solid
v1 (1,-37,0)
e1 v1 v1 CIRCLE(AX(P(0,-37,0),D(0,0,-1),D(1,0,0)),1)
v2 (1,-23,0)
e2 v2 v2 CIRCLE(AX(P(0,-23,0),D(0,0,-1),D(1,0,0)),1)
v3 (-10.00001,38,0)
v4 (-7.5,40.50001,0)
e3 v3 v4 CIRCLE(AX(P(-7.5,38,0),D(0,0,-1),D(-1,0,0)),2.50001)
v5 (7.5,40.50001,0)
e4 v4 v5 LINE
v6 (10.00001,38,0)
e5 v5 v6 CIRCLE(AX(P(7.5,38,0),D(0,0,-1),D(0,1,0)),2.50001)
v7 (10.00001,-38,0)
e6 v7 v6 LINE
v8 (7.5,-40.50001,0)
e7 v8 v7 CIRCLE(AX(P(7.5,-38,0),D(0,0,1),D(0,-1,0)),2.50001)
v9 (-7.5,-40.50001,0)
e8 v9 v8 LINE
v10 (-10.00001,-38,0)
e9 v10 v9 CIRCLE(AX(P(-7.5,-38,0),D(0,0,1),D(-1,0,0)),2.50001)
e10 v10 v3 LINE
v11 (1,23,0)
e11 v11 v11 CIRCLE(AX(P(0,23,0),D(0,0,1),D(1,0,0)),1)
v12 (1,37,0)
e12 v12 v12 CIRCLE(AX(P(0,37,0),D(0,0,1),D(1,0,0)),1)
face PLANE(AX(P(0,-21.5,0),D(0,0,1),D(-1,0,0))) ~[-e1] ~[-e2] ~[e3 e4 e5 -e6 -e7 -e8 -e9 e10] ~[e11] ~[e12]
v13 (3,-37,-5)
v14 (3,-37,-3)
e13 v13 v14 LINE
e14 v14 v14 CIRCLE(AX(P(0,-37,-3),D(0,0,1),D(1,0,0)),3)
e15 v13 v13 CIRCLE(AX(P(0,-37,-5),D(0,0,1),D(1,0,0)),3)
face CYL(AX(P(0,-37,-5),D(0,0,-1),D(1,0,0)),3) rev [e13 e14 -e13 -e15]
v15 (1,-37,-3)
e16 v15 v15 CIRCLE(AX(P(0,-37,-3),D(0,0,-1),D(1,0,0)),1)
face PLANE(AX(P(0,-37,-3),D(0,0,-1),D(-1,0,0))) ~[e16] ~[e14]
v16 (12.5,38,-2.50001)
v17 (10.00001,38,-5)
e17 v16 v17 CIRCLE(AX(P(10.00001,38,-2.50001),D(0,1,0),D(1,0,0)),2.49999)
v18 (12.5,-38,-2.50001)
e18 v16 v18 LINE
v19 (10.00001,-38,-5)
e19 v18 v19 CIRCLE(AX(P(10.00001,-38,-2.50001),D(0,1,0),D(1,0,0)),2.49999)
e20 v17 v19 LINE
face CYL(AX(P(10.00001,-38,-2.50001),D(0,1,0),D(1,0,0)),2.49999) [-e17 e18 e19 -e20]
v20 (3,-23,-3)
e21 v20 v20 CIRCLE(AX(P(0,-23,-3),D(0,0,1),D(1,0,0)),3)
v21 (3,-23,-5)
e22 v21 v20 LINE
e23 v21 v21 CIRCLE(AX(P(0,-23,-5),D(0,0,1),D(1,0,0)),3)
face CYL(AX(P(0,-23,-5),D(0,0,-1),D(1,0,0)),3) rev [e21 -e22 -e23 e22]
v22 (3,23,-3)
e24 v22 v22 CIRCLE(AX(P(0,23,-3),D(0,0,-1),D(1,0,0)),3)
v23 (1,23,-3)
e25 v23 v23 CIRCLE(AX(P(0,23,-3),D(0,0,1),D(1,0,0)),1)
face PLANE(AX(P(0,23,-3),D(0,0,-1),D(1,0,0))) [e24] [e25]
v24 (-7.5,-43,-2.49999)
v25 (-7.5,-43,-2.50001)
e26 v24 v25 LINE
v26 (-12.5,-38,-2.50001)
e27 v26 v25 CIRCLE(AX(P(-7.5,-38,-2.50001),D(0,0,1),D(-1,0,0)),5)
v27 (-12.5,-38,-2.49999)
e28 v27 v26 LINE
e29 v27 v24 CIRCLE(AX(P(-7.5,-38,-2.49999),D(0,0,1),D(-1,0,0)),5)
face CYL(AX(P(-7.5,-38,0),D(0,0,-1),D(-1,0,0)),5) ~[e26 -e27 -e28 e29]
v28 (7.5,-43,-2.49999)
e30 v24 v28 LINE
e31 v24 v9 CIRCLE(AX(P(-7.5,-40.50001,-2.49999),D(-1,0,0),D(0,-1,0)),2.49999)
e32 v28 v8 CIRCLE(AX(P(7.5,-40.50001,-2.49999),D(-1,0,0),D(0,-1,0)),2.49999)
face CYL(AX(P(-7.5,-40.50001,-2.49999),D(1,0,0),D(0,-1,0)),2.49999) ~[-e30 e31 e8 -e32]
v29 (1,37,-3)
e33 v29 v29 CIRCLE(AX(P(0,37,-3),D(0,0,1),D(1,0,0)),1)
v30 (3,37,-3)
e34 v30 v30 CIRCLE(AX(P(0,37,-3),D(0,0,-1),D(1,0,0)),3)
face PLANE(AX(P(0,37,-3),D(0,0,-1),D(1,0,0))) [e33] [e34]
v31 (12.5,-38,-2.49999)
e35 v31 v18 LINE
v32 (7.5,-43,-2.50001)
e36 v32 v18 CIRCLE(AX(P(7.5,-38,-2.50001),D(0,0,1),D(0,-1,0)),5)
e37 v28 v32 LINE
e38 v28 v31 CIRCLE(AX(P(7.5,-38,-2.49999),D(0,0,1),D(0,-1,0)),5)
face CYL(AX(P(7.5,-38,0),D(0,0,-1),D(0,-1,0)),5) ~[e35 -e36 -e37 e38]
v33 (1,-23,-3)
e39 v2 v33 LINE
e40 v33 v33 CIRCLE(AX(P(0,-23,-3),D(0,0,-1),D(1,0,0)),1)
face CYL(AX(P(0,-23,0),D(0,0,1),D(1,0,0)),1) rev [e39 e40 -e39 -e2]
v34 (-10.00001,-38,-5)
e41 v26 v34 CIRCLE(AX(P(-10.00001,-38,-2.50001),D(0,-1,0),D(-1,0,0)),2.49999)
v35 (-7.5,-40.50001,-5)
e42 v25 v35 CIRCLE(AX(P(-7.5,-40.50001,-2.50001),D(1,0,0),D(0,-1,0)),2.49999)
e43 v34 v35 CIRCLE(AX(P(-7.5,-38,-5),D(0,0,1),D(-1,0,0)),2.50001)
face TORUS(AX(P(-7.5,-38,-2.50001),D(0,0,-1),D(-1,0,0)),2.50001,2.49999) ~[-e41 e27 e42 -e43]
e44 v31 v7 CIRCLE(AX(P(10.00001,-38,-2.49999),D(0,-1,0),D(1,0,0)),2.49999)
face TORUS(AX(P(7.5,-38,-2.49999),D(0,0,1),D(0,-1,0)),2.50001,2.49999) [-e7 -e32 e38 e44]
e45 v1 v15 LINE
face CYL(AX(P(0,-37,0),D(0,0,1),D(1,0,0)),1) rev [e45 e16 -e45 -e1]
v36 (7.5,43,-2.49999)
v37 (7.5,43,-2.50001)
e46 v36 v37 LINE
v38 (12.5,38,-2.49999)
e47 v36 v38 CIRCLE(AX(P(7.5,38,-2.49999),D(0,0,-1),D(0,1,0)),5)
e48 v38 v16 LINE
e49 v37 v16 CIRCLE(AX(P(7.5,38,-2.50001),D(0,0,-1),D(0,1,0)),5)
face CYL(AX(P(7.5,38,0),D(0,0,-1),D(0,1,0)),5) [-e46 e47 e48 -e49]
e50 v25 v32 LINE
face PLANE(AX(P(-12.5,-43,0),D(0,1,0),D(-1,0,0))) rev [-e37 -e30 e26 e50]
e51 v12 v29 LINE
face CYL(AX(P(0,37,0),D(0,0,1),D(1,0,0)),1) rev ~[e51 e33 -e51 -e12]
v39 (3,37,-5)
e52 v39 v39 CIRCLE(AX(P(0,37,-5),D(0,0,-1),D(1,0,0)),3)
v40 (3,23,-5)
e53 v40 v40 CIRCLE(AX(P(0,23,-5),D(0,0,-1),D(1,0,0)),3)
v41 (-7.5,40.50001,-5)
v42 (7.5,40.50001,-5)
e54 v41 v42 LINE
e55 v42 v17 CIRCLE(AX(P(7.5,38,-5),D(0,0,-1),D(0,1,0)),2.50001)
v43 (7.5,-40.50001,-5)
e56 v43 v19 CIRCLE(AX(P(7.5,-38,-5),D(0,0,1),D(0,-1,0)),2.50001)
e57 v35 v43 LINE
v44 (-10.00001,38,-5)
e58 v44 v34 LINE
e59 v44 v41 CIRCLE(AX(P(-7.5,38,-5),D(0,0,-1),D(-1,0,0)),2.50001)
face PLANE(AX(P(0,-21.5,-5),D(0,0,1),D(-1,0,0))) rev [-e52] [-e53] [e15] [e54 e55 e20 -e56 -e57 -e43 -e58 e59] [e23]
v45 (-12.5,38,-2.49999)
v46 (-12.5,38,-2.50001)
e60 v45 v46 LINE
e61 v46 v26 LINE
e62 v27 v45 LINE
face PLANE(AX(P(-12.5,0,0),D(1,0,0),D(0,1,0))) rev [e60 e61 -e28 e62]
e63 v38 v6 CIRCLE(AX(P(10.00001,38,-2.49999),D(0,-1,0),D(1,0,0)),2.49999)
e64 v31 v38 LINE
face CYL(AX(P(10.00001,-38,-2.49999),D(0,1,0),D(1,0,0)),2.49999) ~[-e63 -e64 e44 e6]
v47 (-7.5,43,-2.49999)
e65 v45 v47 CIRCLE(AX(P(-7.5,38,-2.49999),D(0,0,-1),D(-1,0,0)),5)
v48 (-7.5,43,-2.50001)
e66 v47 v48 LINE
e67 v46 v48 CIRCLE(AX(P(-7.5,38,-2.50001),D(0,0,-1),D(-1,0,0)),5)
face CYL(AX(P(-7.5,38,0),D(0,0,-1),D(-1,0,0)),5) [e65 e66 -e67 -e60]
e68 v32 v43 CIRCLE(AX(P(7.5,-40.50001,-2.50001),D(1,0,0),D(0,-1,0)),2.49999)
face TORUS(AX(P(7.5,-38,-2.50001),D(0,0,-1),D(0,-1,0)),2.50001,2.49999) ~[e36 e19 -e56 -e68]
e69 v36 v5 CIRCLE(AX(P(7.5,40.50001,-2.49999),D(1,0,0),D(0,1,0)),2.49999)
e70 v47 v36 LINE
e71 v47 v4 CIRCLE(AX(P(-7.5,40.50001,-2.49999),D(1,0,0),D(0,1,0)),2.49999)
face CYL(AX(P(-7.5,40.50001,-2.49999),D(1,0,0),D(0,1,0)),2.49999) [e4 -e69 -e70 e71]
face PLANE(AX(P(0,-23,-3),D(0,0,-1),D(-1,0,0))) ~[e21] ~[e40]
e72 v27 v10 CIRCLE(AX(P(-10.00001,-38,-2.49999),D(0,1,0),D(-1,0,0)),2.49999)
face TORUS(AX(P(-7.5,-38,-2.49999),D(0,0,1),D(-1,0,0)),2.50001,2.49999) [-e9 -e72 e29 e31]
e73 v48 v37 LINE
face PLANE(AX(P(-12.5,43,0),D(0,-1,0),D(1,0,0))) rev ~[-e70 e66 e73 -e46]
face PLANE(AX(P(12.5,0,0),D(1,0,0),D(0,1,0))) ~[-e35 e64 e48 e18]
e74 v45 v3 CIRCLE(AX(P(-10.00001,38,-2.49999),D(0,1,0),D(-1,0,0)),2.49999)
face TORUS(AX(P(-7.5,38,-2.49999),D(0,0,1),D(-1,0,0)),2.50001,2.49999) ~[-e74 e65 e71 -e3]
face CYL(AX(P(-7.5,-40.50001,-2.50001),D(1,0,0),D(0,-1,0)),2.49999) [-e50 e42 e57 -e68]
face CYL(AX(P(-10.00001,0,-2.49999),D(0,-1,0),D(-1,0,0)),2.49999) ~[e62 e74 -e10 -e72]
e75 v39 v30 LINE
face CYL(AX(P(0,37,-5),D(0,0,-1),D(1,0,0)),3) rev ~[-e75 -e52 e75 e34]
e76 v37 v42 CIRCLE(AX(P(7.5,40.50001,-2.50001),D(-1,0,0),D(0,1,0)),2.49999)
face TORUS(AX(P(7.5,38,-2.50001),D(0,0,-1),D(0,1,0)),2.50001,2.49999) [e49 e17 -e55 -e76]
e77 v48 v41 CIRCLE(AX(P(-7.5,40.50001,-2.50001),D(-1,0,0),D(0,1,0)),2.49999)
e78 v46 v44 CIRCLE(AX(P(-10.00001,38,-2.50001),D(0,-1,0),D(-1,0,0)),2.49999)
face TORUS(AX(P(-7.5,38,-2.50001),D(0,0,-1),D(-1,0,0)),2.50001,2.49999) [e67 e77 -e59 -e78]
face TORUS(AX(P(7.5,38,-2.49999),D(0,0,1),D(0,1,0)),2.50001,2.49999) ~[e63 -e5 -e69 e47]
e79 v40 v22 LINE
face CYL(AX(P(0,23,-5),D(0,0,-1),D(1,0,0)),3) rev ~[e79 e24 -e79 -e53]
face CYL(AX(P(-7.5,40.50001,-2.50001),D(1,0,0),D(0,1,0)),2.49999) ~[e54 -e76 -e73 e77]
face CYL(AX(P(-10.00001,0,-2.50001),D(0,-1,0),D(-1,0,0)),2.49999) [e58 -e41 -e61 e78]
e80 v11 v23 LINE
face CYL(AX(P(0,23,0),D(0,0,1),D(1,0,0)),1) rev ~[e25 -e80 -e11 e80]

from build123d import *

# Parameters (mm, degrees)
F0_W     = 25
F0_H     = 43
F1_DEPTH = 5
F2_R     = 1
F3_DEPTH = 5.001
F4_R     = 5
F5_R     = 2.49999
F6_R     = 3
F7_DEPTH = 2


# Not quite as in the source:
# - a fillet or chamfer is up to 0.001 mm smaller than in the source, because OpenCascade refuses the exact size


with BuildPart() as f1:
    # F0 (on Top) → F1 (new body)
    with BuildSketch(Plane.XY):
        with Locations((0, 21.5)):
            Rectangle(F0_W, F0_H)
    extrude(amount=-F1_DEPTH)

    # F2 (on face) → F3 (cut, through all)
    with BuildSketch(Plane.XY):
        with Locations((0, 37)):
            Circle(F2_R)
        with Locations((0, 23)):
            Circle(F2_R)
    extrude(amount=-F3_DEPTH, mode=Mode.SUBTRACT)

    # F4
    f4_edges = [f1.edges().sort_by_distance(p)[0] for p in [
        (-12.5, 43, -2.5),
        (12.5, 43, -2.5),
    ]]
    fillet(f4_edges, radius=F4_R)

    # F5 (radius 2.5 in the source; OpenCascade refuses exactly that, so slightly less here)
    f5_edges = [f1.edges().sort_by_distance(p)[0] for p in [
        (-12.5, 19, 0),
        (-12.5, 19, -5),
    ]]
    fillet(f5_edges, radius=F5_R)

    # F6 (on face) → F7 (cut)
    with BuildSketch(Plane(origin=(0, 0, -5), x_dir=(1, 0, 0), z_dir=(0, 0, -1))):
        with Locations((0, -37)):
            Circle(F6_R)
        with Locations((0, -23)):
            Circle(F6_R)
    extrude(amount=-F7_DEPTH, mode=Mode.SUBTRACT)

    # F8: F1 across plane


with BuildPart() as f1_1:
    add(f1.part)
    add(f1.part.mirror(Plane.XZ))


solid = f1_1.part
